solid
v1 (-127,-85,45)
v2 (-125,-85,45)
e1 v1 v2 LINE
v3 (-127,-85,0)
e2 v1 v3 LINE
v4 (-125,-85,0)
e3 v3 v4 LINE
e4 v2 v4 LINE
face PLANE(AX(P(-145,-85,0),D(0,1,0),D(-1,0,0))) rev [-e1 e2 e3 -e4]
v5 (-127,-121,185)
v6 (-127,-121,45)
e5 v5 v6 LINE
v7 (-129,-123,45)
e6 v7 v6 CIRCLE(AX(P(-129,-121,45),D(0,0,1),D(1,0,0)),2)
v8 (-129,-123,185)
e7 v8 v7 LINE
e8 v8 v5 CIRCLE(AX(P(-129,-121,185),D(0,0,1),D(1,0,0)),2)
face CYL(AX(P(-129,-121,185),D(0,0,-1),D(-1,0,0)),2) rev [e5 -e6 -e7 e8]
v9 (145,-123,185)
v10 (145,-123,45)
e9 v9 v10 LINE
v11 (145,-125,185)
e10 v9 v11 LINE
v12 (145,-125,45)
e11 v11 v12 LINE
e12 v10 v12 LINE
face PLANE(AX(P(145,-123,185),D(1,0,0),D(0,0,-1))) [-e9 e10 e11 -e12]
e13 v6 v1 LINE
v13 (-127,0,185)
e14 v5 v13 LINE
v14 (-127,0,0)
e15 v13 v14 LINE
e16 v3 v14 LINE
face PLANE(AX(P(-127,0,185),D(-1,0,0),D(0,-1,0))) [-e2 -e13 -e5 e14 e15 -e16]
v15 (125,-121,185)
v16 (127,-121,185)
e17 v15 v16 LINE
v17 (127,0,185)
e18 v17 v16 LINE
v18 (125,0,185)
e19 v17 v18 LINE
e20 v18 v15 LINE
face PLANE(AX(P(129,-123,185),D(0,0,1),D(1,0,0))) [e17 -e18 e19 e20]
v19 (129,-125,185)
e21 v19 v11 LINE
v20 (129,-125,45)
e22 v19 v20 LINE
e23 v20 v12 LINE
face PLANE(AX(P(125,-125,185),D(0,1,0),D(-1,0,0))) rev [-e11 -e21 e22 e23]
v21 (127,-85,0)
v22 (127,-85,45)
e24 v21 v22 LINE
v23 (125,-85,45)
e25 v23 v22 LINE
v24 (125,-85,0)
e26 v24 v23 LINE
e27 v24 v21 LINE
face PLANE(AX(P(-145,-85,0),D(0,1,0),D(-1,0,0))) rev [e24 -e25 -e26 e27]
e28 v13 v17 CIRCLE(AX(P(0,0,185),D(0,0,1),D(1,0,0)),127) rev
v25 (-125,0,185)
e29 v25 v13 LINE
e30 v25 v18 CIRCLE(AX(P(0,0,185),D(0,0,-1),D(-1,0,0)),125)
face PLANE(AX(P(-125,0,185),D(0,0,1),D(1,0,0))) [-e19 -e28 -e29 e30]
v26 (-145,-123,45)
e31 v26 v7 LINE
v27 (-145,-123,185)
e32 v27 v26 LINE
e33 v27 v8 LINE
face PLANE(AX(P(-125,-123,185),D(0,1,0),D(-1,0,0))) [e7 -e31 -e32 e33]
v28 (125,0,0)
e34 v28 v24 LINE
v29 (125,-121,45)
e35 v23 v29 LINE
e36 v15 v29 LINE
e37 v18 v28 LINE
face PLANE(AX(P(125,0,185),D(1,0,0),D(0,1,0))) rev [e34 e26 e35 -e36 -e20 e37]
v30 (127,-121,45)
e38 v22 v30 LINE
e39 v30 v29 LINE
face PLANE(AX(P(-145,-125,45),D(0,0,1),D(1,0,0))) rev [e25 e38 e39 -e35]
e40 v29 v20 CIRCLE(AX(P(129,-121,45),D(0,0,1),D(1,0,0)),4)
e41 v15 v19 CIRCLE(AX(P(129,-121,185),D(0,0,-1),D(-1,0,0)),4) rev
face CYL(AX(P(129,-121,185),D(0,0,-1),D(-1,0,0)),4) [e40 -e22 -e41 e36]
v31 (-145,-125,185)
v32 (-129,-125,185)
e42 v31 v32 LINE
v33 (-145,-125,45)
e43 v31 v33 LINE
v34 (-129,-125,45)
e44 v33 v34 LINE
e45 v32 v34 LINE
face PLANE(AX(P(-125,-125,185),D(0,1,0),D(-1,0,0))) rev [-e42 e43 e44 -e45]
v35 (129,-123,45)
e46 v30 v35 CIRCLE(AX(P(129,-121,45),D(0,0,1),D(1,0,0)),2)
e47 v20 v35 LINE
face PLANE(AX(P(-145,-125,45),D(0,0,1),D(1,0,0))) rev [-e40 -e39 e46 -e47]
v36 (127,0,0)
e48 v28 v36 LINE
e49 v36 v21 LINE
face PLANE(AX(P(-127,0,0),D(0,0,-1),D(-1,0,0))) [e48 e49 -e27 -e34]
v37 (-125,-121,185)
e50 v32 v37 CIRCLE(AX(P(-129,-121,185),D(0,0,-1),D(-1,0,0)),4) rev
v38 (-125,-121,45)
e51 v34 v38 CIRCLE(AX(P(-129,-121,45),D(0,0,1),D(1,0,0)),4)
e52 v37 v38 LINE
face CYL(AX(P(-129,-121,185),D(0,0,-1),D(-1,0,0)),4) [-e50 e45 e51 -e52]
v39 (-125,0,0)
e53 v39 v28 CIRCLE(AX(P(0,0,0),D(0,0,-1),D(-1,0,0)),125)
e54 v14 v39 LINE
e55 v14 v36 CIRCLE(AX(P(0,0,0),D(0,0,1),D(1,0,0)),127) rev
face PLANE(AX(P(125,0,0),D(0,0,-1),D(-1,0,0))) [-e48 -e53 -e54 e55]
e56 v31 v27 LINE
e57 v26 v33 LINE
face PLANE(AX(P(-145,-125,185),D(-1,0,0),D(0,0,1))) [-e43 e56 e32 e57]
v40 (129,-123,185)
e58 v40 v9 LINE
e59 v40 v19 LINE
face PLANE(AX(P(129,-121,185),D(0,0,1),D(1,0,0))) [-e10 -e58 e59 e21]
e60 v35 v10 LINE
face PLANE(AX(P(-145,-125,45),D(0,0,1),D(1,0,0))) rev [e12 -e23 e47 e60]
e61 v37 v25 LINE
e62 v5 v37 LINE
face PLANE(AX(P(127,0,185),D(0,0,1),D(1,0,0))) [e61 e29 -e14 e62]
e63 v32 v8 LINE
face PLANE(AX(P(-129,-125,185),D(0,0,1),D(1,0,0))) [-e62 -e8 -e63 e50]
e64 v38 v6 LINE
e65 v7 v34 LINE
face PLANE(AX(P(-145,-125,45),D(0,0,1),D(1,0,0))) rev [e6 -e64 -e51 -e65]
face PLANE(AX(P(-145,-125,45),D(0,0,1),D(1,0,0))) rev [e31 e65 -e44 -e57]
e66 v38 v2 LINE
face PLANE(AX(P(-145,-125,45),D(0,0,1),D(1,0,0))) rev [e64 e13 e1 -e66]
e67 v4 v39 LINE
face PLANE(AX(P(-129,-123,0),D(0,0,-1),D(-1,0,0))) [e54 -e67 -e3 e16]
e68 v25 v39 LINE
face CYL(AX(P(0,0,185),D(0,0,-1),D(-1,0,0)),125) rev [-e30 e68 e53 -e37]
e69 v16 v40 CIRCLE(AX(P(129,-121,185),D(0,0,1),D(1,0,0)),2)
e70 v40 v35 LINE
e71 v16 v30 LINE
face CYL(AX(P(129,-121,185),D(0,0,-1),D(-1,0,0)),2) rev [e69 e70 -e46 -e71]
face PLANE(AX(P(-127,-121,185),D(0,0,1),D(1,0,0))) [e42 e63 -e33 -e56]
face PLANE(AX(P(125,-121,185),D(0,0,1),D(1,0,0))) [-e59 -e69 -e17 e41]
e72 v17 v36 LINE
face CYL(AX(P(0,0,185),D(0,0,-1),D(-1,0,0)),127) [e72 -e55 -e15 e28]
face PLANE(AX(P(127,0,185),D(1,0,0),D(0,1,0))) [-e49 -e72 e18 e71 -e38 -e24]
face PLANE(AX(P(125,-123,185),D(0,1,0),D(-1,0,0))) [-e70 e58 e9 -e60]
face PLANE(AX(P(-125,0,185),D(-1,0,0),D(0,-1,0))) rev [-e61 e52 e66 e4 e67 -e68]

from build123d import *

# Parameters (mm, degrees)
BASE_FLANGE1_DEPTH  = 185
EXTRUDE1_DEPTH      = 353.615938381
EXTRUDE1_DEPTH_BACK = 353.615938381
SKETCH10_W          = 45
SKETCH10_H          = 40


# Sheet-metal steps are written as plain solids
with BuildPart() as part:
    # Sketch1 → Base-Flange1 (new body)
    with BuildSketch(Plane.XY):
        with BuildLine():
            Line((145, -125), (129, -125))
            ThreePointArc((129, -125), (126.171572875, -123.828427125), (125, -121))
            Line((125, -121), (125, 0))
            ThreePointArc((125, 0), (0, 125), (-125, 0))
            Line((-125, 0), (-125, -121))
            ThreePointArc((-125, -121), (-126.171572875, -123.828427125), (-129, -125))
            Line((-129, -125), (-145, -125))
            Line((-145, -125), (-145, -123))
            Line((-145, -123), (-129, -123))
            ThreePointArc((-129, -123), (-127.585786438, -122.414213562), (-127, -121))
            Line((-127, -121), (-127, 0))
            ThreePointArc((-127, 0), (0, 127), (127, 0))
            Line((127, 0), (127, -121))
            ThreePointArc((127, -121), (127.585786438, -122.414213562), (129, -123))
            Line((129, -123), (145, -123))
            Line((145, -123), (145, -125))
        make_face()
    extrude(amount=BASE_FLANGE1_DEPTH)

    # Sketch10 → Extrude1 (cut, two sides: drawn at the far end of the back side and taken through both)
    with BuildSketch(Plane(origin=(127, 0, 0), x_dir=(0, 0, -1), z_dir=(1, 0, 0)).offset(-EXTRUDE1_DEPTH_BACK)):
        with Locations((-22.5, -105)):
            Rectangle(SKETCH10_W, SKETCH10_H)
    extrude(amount=EXTRUDE1_DEPTH + EXTRUDE1_DEPTH_BACK, mode=Mode.SUBTRACT)


solid = part.part
